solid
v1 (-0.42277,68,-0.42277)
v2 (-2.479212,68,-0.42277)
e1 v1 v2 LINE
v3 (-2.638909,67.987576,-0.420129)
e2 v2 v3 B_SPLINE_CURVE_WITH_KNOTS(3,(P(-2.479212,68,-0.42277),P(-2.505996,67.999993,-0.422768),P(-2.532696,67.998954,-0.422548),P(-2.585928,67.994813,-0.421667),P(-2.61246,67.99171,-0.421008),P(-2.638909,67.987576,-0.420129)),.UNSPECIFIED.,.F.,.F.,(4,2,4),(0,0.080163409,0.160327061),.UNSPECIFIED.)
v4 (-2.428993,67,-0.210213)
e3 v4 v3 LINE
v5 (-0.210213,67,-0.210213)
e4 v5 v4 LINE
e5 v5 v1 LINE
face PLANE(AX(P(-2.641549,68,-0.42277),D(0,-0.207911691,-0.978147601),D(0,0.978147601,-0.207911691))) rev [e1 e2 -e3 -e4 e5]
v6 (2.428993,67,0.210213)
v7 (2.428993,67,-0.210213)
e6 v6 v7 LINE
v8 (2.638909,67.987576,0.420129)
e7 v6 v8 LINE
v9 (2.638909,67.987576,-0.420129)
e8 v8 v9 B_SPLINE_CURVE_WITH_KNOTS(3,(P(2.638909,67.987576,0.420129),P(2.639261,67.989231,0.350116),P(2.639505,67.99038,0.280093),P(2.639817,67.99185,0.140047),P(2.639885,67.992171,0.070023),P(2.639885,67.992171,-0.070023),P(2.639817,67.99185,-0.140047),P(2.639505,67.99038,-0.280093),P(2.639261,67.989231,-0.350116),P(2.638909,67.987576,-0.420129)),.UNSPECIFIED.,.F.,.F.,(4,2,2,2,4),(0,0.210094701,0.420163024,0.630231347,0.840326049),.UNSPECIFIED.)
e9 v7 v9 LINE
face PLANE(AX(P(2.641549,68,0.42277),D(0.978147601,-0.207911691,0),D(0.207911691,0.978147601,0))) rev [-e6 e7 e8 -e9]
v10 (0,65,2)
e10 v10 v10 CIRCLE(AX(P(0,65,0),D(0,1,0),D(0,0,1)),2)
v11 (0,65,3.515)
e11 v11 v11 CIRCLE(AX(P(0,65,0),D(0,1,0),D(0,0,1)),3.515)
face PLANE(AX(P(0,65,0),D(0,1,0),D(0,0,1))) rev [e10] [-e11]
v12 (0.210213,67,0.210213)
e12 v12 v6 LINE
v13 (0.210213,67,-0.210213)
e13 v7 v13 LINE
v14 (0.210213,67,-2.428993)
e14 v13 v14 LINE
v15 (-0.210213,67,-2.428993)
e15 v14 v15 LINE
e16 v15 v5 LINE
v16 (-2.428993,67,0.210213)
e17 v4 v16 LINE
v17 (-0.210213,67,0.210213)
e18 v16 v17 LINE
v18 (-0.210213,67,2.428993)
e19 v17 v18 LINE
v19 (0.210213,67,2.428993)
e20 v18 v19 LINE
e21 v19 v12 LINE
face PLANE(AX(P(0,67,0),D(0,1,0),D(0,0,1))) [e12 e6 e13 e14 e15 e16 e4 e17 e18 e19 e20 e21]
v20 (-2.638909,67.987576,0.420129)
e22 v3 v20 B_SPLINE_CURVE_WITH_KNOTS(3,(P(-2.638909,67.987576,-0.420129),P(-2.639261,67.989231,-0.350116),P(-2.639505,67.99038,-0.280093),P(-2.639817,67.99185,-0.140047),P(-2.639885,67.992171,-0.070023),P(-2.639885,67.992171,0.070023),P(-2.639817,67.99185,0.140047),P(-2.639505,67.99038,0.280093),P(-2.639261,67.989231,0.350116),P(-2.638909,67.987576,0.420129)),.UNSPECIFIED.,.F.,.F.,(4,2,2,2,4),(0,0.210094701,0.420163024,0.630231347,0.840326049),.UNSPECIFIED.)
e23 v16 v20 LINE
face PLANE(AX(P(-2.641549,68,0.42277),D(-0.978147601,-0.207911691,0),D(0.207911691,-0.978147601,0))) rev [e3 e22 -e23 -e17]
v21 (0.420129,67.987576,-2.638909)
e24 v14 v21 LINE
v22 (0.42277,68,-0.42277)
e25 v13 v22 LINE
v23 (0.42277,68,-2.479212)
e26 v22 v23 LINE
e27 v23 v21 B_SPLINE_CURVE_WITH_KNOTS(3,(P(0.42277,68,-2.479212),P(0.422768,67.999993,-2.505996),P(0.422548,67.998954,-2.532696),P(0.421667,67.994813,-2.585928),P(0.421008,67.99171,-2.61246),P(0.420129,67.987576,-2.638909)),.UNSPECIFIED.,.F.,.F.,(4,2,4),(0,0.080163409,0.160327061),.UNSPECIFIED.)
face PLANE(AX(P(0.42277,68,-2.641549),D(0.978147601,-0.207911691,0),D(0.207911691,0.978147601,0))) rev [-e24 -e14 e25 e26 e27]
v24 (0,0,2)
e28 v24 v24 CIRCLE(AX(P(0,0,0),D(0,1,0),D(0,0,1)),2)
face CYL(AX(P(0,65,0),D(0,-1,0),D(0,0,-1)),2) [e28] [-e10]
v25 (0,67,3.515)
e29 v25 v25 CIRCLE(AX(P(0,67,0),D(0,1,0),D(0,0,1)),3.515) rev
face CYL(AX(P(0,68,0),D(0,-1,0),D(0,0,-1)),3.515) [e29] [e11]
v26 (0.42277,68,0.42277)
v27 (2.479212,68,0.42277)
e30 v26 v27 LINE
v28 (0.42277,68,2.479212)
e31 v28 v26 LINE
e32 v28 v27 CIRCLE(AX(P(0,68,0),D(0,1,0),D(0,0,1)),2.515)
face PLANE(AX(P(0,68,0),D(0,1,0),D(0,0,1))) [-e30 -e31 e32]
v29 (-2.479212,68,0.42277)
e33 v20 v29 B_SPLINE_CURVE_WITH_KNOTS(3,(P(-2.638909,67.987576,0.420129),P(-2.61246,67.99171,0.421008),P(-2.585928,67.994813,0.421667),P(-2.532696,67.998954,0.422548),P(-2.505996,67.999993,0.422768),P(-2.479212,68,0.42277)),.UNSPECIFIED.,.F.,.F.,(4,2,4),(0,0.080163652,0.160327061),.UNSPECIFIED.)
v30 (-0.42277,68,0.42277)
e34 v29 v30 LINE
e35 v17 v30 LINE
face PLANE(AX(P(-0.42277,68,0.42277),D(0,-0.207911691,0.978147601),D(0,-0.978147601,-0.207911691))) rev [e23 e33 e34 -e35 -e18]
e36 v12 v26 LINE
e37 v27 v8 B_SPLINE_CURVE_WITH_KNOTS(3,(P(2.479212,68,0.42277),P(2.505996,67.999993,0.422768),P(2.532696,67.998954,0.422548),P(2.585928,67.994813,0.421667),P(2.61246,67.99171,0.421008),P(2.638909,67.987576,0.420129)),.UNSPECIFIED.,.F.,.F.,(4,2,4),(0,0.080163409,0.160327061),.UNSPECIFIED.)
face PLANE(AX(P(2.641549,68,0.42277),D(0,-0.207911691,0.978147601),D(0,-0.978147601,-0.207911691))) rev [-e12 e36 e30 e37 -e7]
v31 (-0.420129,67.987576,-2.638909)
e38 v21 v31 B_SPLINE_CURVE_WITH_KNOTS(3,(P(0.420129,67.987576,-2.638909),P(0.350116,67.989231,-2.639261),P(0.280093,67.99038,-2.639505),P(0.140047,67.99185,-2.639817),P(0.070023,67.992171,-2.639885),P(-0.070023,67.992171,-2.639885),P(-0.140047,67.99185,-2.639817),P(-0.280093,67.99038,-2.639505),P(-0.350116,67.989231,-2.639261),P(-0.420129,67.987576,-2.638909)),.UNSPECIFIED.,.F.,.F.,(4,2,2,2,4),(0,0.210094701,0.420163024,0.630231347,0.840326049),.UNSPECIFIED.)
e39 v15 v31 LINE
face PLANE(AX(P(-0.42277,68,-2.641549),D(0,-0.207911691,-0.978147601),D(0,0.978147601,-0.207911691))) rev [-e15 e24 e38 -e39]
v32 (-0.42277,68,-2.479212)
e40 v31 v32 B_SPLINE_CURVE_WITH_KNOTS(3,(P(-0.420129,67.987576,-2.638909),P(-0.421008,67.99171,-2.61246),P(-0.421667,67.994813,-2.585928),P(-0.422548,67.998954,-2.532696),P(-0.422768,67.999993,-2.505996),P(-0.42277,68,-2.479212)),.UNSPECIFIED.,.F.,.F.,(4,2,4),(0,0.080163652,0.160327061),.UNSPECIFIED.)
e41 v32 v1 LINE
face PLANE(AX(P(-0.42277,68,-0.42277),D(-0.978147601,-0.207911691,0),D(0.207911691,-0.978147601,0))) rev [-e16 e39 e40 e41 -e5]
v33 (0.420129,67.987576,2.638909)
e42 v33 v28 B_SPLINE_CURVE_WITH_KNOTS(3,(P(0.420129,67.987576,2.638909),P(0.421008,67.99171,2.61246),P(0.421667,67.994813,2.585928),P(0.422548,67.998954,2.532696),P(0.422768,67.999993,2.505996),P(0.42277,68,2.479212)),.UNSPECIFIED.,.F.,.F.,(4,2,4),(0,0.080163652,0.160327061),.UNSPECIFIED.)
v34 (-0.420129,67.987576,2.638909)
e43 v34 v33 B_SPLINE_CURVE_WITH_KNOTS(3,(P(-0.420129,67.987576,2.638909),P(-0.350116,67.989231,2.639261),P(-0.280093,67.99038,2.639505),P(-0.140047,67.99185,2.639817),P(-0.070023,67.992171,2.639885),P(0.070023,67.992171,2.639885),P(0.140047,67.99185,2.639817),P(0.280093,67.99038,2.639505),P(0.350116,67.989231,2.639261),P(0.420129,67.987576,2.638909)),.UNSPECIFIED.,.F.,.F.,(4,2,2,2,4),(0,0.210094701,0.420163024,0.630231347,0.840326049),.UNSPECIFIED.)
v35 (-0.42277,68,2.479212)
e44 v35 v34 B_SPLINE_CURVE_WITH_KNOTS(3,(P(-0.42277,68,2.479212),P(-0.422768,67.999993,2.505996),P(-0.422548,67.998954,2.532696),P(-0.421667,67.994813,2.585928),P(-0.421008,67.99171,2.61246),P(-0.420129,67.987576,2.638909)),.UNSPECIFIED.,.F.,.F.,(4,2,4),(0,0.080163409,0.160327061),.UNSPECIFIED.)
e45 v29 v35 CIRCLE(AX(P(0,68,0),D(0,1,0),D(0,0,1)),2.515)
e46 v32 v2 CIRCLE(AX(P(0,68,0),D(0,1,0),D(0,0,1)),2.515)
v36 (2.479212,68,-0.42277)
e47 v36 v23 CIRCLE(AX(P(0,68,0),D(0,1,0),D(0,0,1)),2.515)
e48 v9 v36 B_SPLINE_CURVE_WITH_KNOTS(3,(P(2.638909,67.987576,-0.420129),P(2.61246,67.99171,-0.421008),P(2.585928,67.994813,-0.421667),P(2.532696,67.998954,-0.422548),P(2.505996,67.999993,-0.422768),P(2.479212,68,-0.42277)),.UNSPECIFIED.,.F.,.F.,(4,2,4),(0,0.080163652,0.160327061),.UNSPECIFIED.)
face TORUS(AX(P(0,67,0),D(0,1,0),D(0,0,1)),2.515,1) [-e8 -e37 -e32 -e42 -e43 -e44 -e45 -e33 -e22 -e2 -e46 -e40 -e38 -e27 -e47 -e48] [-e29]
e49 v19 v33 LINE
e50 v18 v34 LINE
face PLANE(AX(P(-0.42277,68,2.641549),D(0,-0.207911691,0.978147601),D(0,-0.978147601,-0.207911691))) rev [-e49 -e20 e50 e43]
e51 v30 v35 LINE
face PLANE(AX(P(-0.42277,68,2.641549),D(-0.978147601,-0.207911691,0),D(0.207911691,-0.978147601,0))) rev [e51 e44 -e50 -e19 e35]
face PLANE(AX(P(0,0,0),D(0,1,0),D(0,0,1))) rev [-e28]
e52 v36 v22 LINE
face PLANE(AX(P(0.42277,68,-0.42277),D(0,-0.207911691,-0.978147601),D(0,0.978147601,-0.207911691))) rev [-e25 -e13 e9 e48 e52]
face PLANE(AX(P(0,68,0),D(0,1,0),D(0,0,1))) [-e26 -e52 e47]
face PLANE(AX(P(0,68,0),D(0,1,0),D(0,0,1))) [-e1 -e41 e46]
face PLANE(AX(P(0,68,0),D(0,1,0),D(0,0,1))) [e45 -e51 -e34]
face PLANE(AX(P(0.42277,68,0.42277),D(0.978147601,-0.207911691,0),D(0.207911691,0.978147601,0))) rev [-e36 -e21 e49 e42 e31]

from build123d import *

# Parameters (mm, degrees)
SKETCH_1_R          = 2
EXTRUDE_1_DEPTH     = 65
SKETCH_2_R          = 3.515
EXTRUDE_2_DEPTH     = 3
CUT_EXTRUDE_1_DEPTH = 1
CUT_EXTRUDE_1_DRAFT = -12
FILLET_2_R          = 1


with BuildPart() as part:
    # Эскиз1 → Бобышка-Вытянуть1 (new body)
    with BuildSketch(Plane(origin=(0, 0, 0), x_dir=(1, 0, 0), z_dir=(0, 1, 0))):
        with Locations(Location((0, 0, 0), (0, 0, 270))):
            Circle(SKETCH_1_R)
    extrude(amount=EXTRUDE_1_DEPTH)

    # Эскиз2 → Бобышка-Вытянуть2 (add)
    with BuildSketch(Plane(origin=(0, 65, 0), x_dir=(1, 0, 0), z_dir=(0, 1, 0))):
        with Locations(Location((0, 0, 0), (0, 0, 270))):
            Circle(SKETCH_2_R)
    extrude(amount=EXTRUDE_2_DEPTH)


with BuildPart() as cut_extrude_1_tool:
    # Эскиз3 → Вырез-Вытянуть1 (with draft: the straight prism first)
    with BuildSketch(Plane(origin=(0, 68, 0), x_dir=(1, 0, 0), z_dir=(0, 1, 0))):
        Polygon((-2.641549473, 0.422769916), (-2.641549473, -0.422769916), (-0.422769916, -0.422769916), (-0.422769916, -2.641549473), (0.422769916, -2.641549473), (0.422769916, -0.422769916), (2.641549473, -0.422769916), (2.641549473, 0.422769916), (0.422769916, 0.422769916), (0.422769916, 2.641549473), (-0.422769916, 2.641549473), (-0.422769916, 0.422769916), align=None)
    extrude(amount=-CUT_EXTRUDE_1_DEPTH)
    # Вырез-Вытянуть1: the draft: its side faces are tilted about the plane it starts from
    cut_extrude_1_sides = [cut_extrude_1_tool.faces().sort_by_distance(p)[0] for p in [
        (-2.641549473, 67.5, 0),
        (-1.532159694, 67.5, 0.422769916),
        (-0.422769916, 67.5, 1.532159694),
        (0, 67.5, 2.641549473),
        (0.422769916, 67.5, 1.532159694),
        (1.532159694, 67.5, 0.422769916),
        (2.641549473, 67.5, 0),
        (1.532159694, 67.5, -0.422769916),
        (0.422769916, 67.5, -1.532159694),
        (0, 67.5, -2.641549473),
        (-0.422769916, 67.5, -1.532159694),
        (-1.532159694, 67.5, -0.422769916),
    ]]
    draft(cut_extrude_1_sides, Plane(origin=(0, 68, 0), x_dir=(1, 0, 0), z_dir=(0, 1, 0)), CUT_EXTRUDE_1_DRAFT)


with BuildPart() as part_1:
    add(part.part)

    # Вырез-Вытянуть1: cut by cut_extrude_1_tool
    add(cut_extrude_1_tool.part, mode=Mode.SUBTRACT)

    # Скругление2
    # the kernel refuses this fillet: 1 mm, written as the material it takes off along each edge
    with BuildSketch(Plane(origin=(0, 68, 0), x_dir=(0, 0, 1), z_dir=(-1, 0, 0))) as fillet_2_piece_1:
        with BuildLine():
            CenterArc((3.515 - FILLET_2_R, -FILLET_2_R), FILLET_2_R, 0, 90)
            Line((3.515 - FILLET_2_R, 0), (3.515, 0))
            Line((3.515, 0), (3.515, -FILLET_2_R))
        make_face()
    revolve(axis=Axis((0, 68, 0), (0, 1, 0)), mode=Mode.SUBTRACT)


solid = part_1.part
